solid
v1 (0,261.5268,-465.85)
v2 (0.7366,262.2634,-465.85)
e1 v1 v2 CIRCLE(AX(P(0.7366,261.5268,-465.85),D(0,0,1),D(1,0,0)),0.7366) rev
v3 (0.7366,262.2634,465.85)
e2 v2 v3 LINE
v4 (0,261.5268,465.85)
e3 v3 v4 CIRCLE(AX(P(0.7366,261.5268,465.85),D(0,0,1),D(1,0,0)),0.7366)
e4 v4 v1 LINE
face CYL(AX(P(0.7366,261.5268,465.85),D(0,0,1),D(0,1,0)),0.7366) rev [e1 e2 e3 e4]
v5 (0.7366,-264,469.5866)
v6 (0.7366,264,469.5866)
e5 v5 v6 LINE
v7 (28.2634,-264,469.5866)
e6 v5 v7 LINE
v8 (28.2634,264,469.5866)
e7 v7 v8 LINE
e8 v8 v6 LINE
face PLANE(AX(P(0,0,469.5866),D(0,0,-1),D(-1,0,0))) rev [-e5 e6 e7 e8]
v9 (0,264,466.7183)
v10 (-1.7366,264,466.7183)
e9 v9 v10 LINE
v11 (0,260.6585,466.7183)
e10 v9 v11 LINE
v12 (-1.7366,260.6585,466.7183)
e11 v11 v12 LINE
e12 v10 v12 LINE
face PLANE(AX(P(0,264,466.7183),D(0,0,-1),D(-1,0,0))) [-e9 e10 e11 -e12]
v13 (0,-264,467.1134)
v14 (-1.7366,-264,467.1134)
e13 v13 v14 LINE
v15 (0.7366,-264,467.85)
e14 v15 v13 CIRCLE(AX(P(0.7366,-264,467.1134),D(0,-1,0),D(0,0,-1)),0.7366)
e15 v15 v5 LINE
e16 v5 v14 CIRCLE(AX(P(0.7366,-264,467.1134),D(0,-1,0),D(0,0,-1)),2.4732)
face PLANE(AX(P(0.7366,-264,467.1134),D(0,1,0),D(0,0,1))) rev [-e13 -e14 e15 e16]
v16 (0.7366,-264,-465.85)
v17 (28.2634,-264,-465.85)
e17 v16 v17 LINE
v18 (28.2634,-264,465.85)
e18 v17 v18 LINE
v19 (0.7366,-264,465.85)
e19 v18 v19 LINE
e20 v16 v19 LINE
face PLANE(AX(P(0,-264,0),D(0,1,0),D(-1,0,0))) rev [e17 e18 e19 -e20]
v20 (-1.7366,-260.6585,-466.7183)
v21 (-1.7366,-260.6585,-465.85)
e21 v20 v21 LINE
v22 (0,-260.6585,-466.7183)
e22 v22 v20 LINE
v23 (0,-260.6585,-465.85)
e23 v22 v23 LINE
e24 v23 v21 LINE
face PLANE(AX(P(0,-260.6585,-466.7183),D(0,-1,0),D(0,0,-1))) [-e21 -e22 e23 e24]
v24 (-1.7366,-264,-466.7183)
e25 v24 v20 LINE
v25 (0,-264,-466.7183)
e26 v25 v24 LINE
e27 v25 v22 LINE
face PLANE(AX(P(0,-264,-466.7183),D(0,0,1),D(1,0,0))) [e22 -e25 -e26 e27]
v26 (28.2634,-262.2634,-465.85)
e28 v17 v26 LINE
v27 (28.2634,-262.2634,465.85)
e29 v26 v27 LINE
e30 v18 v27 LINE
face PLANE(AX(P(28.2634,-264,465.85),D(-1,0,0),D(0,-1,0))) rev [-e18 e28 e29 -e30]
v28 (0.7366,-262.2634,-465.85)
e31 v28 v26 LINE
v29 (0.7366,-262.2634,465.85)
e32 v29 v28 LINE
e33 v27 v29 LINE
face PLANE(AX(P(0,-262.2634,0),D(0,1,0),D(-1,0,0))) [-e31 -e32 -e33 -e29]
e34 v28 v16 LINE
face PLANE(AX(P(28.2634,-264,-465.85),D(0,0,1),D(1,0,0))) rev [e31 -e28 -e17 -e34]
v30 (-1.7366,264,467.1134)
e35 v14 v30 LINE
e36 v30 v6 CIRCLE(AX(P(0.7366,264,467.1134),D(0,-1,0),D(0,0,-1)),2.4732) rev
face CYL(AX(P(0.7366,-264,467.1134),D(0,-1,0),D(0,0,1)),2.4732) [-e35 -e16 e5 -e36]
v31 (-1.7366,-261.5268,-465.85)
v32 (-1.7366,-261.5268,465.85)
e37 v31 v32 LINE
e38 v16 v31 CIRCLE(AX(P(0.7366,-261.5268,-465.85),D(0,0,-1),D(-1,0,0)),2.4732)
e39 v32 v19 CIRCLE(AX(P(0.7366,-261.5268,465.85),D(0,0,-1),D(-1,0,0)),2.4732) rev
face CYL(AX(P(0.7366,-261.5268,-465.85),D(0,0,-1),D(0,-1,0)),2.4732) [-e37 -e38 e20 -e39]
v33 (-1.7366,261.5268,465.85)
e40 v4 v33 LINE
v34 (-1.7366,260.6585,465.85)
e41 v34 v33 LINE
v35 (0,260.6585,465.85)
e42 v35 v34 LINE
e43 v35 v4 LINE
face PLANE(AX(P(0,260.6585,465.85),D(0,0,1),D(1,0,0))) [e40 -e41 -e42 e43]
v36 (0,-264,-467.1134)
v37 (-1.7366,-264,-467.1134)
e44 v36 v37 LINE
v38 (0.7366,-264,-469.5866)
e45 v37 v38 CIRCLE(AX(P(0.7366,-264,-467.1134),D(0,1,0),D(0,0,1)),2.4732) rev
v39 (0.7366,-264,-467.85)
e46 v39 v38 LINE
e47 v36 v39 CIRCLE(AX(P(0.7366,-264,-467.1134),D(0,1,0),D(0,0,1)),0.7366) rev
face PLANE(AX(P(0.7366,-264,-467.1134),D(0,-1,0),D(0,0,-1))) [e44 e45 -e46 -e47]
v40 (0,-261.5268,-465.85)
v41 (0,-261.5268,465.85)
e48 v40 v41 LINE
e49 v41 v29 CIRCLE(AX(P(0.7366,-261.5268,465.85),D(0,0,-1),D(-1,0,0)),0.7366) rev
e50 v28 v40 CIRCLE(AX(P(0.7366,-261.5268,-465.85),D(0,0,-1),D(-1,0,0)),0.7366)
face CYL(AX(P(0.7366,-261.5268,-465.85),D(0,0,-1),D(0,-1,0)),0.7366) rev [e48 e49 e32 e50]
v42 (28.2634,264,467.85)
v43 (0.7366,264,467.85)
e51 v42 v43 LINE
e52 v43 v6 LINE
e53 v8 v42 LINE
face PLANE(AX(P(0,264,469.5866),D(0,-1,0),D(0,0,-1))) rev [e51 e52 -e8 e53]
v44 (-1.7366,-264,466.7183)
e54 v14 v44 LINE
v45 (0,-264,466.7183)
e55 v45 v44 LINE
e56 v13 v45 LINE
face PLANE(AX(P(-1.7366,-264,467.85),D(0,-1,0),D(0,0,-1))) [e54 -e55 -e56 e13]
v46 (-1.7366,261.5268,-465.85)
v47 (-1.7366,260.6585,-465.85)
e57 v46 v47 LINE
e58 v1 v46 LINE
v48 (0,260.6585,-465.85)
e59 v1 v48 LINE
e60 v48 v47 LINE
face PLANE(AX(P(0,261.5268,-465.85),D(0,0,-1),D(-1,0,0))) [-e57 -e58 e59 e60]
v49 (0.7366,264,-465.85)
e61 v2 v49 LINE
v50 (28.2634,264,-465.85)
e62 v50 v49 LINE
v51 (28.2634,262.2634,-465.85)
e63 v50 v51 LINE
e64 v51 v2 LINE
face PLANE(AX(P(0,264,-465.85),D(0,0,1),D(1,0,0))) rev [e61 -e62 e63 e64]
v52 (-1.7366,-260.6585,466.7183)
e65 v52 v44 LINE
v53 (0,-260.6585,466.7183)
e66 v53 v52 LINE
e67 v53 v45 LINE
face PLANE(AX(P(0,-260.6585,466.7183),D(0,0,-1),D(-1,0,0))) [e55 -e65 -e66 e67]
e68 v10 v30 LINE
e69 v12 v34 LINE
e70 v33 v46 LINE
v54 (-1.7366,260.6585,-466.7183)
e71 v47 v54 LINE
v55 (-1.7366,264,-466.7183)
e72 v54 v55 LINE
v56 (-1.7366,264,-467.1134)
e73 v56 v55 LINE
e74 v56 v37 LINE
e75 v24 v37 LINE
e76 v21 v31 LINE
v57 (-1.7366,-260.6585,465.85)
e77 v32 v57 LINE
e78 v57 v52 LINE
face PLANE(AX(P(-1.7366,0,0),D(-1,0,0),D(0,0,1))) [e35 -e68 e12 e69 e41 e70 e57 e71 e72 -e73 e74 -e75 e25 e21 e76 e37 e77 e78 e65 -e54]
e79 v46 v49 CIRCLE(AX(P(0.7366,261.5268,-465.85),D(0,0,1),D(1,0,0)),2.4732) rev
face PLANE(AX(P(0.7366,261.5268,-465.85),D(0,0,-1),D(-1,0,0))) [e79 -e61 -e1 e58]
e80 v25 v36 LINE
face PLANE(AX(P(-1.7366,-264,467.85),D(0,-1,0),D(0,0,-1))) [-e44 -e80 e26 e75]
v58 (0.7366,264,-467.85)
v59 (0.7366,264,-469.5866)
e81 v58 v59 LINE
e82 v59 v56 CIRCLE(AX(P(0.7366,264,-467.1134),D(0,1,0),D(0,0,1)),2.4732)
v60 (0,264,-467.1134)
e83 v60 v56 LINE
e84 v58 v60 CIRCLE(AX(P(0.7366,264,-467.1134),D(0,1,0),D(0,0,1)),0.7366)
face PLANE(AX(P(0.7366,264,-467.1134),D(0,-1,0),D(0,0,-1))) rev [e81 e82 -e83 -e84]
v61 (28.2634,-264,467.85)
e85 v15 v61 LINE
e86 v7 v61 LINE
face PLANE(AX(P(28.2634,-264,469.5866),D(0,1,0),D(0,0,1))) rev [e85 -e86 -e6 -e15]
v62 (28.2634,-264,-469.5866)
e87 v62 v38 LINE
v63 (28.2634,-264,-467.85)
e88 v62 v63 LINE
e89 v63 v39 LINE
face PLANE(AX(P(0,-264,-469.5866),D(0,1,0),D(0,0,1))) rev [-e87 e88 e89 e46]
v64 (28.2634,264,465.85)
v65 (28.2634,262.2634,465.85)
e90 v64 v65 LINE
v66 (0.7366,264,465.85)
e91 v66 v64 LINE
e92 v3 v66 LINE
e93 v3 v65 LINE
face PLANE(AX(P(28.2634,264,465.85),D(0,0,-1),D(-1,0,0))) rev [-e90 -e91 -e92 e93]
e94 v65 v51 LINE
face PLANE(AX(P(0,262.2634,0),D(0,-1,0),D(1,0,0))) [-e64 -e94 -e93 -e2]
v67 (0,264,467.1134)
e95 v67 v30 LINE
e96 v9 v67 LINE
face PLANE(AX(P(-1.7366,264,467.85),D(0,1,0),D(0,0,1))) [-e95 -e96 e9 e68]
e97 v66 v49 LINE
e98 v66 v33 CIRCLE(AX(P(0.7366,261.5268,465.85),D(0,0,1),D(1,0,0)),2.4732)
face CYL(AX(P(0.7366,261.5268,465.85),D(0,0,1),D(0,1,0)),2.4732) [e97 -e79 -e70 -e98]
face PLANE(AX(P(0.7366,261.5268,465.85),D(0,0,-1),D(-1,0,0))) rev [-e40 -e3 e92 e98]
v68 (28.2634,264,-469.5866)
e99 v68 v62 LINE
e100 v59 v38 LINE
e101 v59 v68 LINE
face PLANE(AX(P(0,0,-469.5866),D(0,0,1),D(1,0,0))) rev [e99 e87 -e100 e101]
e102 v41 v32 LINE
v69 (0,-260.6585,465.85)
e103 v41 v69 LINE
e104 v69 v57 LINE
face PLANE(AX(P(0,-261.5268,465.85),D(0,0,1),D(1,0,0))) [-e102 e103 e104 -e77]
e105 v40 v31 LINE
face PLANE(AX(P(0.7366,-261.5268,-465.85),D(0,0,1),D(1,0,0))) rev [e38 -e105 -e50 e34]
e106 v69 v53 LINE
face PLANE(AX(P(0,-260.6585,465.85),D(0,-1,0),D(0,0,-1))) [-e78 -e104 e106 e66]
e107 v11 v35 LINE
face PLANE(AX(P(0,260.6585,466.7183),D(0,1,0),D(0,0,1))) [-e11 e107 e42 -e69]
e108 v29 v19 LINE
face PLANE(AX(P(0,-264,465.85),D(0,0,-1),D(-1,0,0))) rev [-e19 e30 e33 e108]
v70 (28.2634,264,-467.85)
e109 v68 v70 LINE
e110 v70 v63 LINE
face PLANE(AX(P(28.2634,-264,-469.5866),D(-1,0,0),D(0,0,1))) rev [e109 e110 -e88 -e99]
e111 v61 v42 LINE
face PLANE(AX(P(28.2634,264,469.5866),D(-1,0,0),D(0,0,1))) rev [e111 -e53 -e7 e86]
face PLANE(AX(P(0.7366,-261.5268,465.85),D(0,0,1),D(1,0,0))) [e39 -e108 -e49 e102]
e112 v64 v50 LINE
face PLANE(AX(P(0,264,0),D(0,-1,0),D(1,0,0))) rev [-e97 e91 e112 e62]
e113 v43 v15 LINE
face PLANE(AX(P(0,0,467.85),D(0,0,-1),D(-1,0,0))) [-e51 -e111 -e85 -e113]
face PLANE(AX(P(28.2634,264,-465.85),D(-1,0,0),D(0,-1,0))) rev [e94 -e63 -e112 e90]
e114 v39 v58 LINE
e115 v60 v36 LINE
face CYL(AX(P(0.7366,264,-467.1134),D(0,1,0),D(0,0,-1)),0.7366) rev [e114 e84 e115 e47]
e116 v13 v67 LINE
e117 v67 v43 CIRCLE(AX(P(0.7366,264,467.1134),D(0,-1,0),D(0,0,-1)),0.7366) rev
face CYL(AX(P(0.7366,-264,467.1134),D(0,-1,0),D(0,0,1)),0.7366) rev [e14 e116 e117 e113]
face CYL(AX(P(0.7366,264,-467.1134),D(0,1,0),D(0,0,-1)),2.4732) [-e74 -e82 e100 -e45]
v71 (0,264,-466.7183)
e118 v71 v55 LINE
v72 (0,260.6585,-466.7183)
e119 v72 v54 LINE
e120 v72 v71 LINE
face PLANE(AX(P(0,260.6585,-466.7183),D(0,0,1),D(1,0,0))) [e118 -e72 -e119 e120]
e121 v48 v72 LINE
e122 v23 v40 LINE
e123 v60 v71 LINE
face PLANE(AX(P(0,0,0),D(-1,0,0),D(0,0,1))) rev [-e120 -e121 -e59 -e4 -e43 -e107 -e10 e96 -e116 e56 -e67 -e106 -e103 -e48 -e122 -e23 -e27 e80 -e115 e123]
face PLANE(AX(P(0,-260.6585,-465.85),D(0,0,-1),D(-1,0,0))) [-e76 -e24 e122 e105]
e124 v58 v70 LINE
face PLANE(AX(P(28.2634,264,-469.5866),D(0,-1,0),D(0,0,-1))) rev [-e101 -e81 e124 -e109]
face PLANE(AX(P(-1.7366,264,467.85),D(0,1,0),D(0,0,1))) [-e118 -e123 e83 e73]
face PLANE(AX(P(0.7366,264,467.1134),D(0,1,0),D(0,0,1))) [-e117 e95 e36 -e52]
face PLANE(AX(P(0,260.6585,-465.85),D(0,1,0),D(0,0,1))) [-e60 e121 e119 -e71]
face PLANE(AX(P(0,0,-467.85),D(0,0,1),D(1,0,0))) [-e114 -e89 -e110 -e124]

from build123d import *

# Parameters (mm, degrees)
SKETCH1_W                     = 935.7
SKETCH1_H                     = 528
BASE_FLANGE1_DEPTH            = 1.7366
EDGE_FLANGE1_STRIP_W          = 8.4196
EDGE_FLANGE1_STRIP_H          = 1.7366
EDGE_FLANGE1_STRIP_CUT_DEPTH  = 931.7
EDGE_FLANGE1_RELIEF_W         = 9.2879
EDGE_FLANGE1_RELIEF_H         = 0.8683
EDGE_FLANGE1_RELIEF_CUT_DEPTH = 1.7366
EDGE_FLANGE1_DEPTH            = 931.7
EDGE_FLANGE2_STRIP_W          = 8.4196
EDGE_FLANGE2_STRIP_H          = 1.7366
EDGE_FLANGE2_STRIP_CUT_DEPTH  = 931.7
EDGE_FLANGE2_RELIEF_W         = 9.2879
EDGE_FLANGE2_RELIEF_H         = 0.8683
EDGE_FLANGE2_RELIEF_CUT_DEPTH = 1.7366
EDGE_FLANGE2_DEPTH            = 931.7
EDGE_FLANGE4_STRIP_W          = 8.4196
EDGE_FLANGE4_STRIP_H          = 1.7366
EDGE_FLANGE4_STRIP_CUT_DEPTH  = 528
EDGE_FLANGE4_DEPTH            = 528
EDGE_FLANGE5_STRIP_W          = 8.4196
EDGE_FLANGE5_STRIP_H          = 1.7366
EDGE_FLANGE5_STRIP_CUT_DEPTH  = 528
EDGE_FLANGE5_DEPTH            = 528


# Sheet-metal steps are written as plain solids
with BuildPart() as part:
    # Sketch1 → Base-Flange1 (new body)
    with BuildSketch(Plane(origin=(0, 0, 0), x_dir=(0, 0, -1), z_dir=(1, 0, 0))):
        Rectangle(SKETCH1_W, SKETCH1_H)
    extrude(amount=-BASE_FLANGE1_DEPTH)

    # Edge-Flange1 strip (across the edge) → Edge-Flange1 strip cut (cut)
    with BuildSketch(Plane(origin=(0, 264, -465.85), x_dir=(0, -1, 0), z_dir=(0, 0, 1))):
        with Locations((-1.7366, -0.8683)):
            Rectangle(EDGE_FLANGE1_STRIP_W, EDGE_FLANGE1_STRIP_H)
    extrude(amount=EDGE_FLANGE1_STRIP_CUT_DEPTH, mode=Mode.SUBTRACT)

    # Edge-Flange1 relief (on the sheet) → Edge-Flange1 relief cut (cut)
    with BuildSketch(Plane(origin=(0, 261.5268, -465.85), x_dir=(0, -1, 0), z_dir=(1, 0, 0))):
        with Locations((-3.77565, 0.43415)):
            Rectangle(EDGE_FLANGE1_RELIEF_W, EDGE_FLANGE1_RELIEF_H)
        with Locations((-3.77565, -932.13415)):
            Rectangle(EDGE_FLANGE1_RELIEF_W, EDGE_FLANGE1_RELIEF_H)
    extrude(amount=-EDGE_FLANGE1_RELIEF_CUT_DEPTH, mode=Mode.SUBTRACT)

    # Edge-Flange1 section (across the edge) → Edge-Flange1 (add)
    with BuildSketch(Plane(origin=(0, 264, -465.85), x_dir=(0, -1, 0), z_dir=(0, 0, 1))):
        with BuildLine():
            Line((0, 0.7366), (0, 28.2634))
            Line((0, 28.2634), (1.7366, 28.2634))
            Line((1.7366, 28.2634), (1.7366, 0.7366))
            ThreePointArc((1.7366, 0.7366), (1.952345145, 0.215745145), (2.4732, 0))
            Line((2.4732, 0), (2.4732, -1.7366))
            ThreePointArc((2.4732, -1.7366), (0.724383509, -1.012216491), (0, 0.7366))
        make_face()
    extrude(amount=EDGE_FLANGE1_DEPTH)

    # Edge-Flange2 strip (across the edge) → Edge-Flange2 strip cut (cut)
    with BuildSketch(Plane(origin=(0, -264, 465.85), x_dir=(0, 1, 0), z_dir=(0, 0, -1))):
        with Locations((-1.7366, -0.8683)):
            Rectangle(EDGE_FLANGE2_STRIP_W, EDGE_FLANGE2_STRIP_H)
    extrude(amount=EDGE_FLANGE2_STRIP_CUT_DEPTH, mode=Mode.SUBTRACT)

    # Edge-Flange2 relief (on the sheet) → Edge-Flange2 relief cut (cut)
    with BuildSketch(Plane(origin=(0, -261.5268, 465.85), x_dir=(0, 1, 0), z_dir=(1, 0, 0))):
        with Locations((-3.77565, 0.43415)):
            Rectangle(EDGE_FLANGE2_RELIEF_W, EDGE_FLANGE2_RELIEF_H)
        with Locations((-3.77565, -932.13415)):
            Rectangle(EDGE_FLANGE2_RELIEF_W, EDGE_FLANGE2_RELIEF_H)
    extrude(amount=-EDGE_FLANGE2_RELIEF_CUT_DEPTH, mode=Mode.SUBTRACT)

    # Edge-Flange2 section (across the edge) → Edge-Flange2 (add)
    with BuildSketch(Plane(origin=(0, -264, 465.85), x_dir=(0, 1, 0), z_dir=(0, 0, -1))):
        with BuildLine():
            Line((0, 0.7366), (0, 28.2634))
            Line((0, 28.2634), (1.7366, 28.2634))
            Line((1.7366, 28.2634), (1.7366, 0.7366))
            ThreePointArc((1.7366, 0.7366), (1.952345145, 0.215745145), (2.4732, 0))
            Line((2.4732, 0), (2.4732, -1.7366))
            ThreePointArc((2.4732, -1.7366), (0.724383509, -1.012216491), (0, 0.7366))
        make_face()
    extrude(amount=EDGE_FLANGE2_DEPTH)

    # Edge-Flange4 strip (across the edge) → Edge-Flange4 strip cut (cut)
    with BuildSketch(Plane(origin=(0, 264, 467.85), x_dir=(0, 0, -1), z_dir=(0, -1, 0))):
        with Locations((-3.4732, -0.8683)):
            Rectangle(EDGE_FLANGE4_STRIP_W, EDGE_FLANGE4_STRIP_H)
    extrude(amount=EDGE_FLANGE4_STRIP_CUT_DEPTH, mode=Mode.SUBTRACT)

    # Edge-Flange4 section (across the edge) → Edge-Flange4 (add)
    with BuildSketch(Plane(origin=(0, 264, 467.85), x_dir=(0, 0, -1), z_dir=(0, -1, 0))):
        with BuildLine():
            Line((-1.7366, 0.7366), (-1.7366, 28.2634))
            Line((-1.7366, 28.2634), (0, 28.2634))
            Line((0, 28.2634), (0, 0.7366))
            ThreePointArc((0, 0.7366), (0.215745145, 0.215745145), (0.7366, 0))
            Line((0.7366, 0), (0.7366, -1.7366))
            ThreePointArc((0.7366, -1.7366), (-1.012216491, -1.012216491), (-1.7366, 0.7366))
        make_face()
    extrude(amount=EDGE_FLANGE4_DEPTH)

    # Edge-Flange5 strip (across the edge) → Edge-Flange5 strip cut (cut)
    with BuildSketch(Plane(origin=(0, -264, -467.85), x_dir=(0, 0, 1), z_dir=(0, 1, 0))):
        with Locations((-3.4732, -0.8683)):
            Rectangle(EDGE_FLANGE5_STRIP_W, EDGE_FLANGE5_STRIP_H)
    extrude(amount=EDGE_FLANGE5_STRIP_CUT_DEPTH, mode=Mode.SUBTRACT)

    # Edge-Flange5 section (across the edge) → Edge-Flange5 (add)
    with BuildSketch(Plane(origin=(0, -264, -467.85), x_dir=(0, 0, 1), z_dir=(0, 1, 0))):
        with BuildLine():
            Line((-1.7366, 0.7366), (-1.7366, 28.2634))
            Line((-1.7366, 28.2634), (0, 28.2634))
            Line((0, 28.2634), (0, 0.7366))
            ThreePointArc((0, 0.7366), (0.215745145, 0.215745145), (0.7366, 0))
            Line((0.7366, 0), (0.7366, -1.7366))
            ThreePointArc((0.7366, -1.7366), (-1.012216491, -1.012216491), (-1.7366, 0.7366))
        make_face()
    extrude(amount=EDGE_FLANGE5_DEPTH)


solid = part.part
